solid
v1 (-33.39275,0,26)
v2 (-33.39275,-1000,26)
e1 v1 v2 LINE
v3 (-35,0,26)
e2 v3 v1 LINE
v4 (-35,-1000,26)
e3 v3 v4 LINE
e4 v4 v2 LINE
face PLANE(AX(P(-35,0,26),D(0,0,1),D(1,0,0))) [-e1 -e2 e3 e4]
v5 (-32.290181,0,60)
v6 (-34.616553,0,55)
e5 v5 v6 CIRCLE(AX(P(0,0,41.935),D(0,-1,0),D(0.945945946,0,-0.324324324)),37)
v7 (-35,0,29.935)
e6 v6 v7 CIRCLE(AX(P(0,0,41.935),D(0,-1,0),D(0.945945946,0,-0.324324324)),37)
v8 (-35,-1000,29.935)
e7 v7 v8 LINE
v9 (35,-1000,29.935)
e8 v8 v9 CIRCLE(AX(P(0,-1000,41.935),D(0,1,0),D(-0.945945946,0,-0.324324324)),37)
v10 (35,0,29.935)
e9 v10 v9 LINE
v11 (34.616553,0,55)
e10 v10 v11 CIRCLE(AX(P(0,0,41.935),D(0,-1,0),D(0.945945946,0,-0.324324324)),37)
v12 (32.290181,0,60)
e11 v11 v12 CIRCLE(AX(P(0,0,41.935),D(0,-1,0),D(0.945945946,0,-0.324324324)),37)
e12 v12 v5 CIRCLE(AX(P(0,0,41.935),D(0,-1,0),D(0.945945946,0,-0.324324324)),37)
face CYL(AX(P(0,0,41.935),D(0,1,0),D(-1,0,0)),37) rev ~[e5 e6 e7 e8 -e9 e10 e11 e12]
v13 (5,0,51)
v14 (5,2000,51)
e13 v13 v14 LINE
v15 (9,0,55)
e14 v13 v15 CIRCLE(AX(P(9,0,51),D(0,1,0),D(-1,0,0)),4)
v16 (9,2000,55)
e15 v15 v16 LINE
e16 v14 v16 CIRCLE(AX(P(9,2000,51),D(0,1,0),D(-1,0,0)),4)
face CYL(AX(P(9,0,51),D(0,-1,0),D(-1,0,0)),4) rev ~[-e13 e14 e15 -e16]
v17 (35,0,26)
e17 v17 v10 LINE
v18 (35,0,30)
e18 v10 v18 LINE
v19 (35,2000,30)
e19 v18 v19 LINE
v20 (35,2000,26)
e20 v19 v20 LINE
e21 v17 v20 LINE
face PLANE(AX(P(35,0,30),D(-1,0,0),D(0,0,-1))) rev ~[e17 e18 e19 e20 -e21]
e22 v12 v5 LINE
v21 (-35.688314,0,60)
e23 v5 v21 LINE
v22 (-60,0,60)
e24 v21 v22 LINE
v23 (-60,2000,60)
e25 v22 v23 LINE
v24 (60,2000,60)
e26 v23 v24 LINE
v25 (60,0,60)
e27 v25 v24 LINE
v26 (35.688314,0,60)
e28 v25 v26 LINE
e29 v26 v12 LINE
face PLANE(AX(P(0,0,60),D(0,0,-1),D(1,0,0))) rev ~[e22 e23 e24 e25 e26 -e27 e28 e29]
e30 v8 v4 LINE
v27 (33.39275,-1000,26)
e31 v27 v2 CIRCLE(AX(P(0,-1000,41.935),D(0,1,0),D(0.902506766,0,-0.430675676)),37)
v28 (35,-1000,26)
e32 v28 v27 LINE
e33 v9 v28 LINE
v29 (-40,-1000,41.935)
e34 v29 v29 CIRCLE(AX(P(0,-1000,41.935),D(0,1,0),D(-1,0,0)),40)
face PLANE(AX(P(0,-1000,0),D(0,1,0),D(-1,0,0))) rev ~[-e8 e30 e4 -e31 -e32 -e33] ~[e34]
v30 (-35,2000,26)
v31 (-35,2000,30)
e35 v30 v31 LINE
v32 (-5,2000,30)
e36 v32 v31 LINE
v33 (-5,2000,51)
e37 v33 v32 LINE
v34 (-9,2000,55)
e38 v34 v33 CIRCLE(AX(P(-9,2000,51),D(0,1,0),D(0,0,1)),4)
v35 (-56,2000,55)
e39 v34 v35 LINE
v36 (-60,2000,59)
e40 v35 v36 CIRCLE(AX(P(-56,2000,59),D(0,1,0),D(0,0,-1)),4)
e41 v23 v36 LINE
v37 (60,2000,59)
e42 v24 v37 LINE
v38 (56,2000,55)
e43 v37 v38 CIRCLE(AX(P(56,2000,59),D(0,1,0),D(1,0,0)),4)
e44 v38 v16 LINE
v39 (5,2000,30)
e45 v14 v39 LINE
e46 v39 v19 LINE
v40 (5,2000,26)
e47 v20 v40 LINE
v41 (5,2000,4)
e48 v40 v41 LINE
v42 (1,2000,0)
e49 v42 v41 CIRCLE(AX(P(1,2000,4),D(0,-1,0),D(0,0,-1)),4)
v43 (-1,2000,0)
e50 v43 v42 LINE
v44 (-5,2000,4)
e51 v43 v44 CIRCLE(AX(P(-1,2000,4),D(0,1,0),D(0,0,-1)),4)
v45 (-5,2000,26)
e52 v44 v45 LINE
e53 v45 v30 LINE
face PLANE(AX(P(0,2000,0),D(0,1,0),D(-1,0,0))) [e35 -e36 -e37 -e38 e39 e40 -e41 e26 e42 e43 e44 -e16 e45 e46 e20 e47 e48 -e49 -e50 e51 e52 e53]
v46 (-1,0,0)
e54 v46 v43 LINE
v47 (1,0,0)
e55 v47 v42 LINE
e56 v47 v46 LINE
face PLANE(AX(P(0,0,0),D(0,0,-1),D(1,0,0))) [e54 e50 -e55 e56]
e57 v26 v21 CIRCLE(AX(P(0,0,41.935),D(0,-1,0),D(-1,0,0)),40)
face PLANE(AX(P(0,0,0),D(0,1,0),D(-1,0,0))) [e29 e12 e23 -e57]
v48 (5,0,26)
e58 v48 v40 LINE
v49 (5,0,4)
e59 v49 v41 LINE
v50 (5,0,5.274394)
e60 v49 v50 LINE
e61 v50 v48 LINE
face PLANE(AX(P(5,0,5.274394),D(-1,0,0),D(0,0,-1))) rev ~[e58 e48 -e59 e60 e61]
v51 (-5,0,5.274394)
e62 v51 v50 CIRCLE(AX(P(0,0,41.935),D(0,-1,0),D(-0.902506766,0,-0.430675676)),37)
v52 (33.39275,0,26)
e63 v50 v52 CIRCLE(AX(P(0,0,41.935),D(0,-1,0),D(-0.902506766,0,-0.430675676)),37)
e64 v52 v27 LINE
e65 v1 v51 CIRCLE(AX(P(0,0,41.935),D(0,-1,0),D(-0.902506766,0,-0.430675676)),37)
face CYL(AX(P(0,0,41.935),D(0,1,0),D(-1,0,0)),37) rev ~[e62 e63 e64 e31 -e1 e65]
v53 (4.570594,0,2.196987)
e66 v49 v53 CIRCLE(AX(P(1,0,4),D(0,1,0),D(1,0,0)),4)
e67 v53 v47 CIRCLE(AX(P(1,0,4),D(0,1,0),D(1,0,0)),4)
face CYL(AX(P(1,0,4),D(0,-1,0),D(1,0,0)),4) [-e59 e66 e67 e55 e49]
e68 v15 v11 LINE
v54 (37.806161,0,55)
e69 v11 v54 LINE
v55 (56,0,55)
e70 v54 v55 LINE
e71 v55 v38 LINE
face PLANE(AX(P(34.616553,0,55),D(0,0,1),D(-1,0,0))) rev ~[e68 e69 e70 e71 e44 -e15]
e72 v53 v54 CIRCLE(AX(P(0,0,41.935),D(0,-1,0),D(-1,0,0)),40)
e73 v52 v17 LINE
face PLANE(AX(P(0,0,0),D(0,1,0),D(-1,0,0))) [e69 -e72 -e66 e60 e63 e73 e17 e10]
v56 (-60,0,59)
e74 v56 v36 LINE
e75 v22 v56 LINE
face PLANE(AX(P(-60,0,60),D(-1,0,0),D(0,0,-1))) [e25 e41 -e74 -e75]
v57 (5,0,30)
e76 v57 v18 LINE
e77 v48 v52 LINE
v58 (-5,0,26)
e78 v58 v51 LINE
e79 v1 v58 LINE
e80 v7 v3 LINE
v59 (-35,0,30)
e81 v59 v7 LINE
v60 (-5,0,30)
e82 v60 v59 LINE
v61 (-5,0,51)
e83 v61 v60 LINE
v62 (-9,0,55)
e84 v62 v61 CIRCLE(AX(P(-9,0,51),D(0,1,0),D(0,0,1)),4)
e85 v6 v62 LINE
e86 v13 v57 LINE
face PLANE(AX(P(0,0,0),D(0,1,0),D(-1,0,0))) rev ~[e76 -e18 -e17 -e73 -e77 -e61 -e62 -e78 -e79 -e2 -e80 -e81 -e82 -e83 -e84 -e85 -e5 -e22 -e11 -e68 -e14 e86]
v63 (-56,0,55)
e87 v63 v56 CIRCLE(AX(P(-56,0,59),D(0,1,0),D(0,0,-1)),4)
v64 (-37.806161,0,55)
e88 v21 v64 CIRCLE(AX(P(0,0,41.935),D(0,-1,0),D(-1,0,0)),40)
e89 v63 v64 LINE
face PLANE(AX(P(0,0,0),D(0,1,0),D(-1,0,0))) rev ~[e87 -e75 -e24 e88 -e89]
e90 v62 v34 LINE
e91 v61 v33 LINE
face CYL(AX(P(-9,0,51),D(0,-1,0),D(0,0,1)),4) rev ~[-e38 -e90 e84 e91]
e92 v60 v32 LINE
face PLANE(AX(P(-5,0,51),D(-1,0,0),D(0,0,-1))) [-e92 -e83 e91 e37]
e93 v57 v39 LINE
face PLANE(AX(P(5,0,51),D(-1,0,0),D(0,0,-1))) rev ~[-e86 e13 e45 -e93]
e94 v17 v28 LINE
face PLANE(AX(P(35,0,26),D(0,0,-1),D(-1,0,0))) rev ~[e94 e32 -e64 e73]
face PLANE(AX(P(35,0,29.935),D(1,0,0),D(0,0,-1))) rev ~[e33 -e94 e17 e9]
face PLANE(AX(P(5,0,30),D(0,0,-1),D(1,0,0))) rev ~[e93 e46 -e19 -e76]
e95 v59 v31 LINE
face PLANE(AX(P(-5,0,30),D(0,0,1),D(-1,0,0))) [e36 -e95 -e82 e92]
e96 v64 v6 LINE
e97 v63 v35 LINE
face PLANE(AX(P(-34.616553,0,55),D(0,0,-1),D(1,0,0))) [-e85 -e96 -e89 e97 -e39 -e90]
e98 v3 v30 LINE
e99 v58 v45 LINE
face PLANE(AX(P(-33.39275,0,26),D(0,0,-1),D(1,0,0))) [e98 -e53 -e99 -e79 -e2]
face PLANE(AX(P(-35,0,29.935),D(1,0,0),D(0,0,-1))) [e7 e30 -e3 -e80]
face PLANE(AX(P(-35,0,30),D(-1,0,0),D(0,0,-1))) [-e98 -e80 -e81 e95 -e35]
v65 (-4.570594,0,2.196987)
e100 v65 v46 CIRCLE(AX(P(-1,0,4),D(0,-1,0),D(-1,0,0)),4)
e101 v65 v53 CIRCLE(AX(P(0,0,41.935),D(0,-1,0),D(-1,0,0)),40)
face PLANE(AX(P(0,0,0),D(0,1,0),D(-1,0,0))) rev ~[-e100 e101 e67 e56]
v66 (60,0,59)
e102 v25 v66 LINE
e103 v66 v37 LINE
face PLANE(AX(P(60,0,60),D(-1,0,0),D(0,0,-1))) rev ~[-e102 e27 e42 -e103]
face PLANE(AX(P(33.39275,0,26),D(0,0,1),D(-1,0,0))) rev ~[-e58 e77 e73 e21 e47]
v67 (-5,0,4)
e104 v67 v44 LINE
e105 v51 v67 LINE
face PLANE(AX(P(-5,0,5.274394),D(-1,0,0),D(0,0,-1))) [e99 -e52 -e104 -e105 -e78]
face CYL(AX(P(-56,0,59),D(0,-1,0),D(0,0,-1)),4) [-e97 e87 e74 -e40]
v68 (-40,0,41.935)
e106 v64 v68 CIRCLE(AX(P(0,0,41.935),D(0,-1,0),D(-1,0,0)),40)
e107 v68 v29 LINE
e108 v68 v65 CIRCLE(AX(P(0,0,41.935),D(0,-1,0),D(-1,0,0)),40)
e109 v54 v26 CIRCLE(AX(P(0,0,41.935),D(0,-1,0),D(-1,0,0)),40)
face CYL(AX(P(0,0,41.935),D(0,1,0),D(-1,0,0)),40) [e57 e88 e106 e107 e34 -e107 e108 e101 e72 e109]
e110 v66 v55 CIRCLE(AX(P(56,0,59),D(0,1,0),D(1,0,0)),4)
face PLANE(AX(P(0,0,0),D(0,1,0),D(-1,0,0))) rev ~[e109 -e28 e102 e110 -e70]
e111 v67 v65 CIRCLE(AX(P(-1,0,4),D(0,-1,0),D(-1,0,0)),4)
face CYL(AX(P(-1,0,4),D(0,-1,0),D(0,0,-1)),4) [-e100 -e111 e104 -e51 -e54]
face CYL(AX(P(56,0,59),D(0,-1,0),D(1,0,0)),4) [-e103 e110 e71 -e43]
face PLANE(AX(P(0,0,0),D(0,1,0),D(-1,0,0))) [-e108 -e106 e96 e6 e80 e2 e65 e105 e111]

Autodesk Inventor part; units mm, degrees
ref_plane "YZ Plane" through (0, 0, 0) normal (1, 0, 0) x (0, 1, 0)
ref_plane "XZ Plane" through (0, 0, 0) normal (0, 1, 0) x (-1, 0, 0)
ref_plane "XY Plane" through (0, 0, 0) normal (0, 0, 1) x (1, 0, 0)
sketch "Sketch1" plane through (0, 0, 0) normal (0, 1, 0) x (-1, 0, 0)
  line L0 (0, 0) -> (0, 60)
  line L1 (0, 60) -> (60, 60)
  line L2 (56, 55) -> (9, 55)
  line L3 (5, 51) -> (5, 4)
  line L4 (60, 60) -> (60, 59)
  line L5 (0, 0) -> (1, 0)
  arc A0 (1, 0) -> (5, 4) centre (1, 4) ccw
  arc A1 (56, 55) -> (60, 59) centre (56, 59) ccw
  arc A2 (9, 55) -> (5, 51) centre (9, 51) ccw
  line L6 (5, 30) -> (35, 30)
  line L7 (35, 30) -> (35, 26)
  line L8 (35, 26) -> (5, 26)
  line L9 (0, 60) -> (-60, 60)
  line L10 (-56, 55) -> (-9, 55)
  line L11 (-5, 51) -> (-5, 4)
  line L12 (-60, 60) -> (-60, 59)
  line L13 (0, 0) -> (-1, 0)
  arc A3 (-5, 4) -> (-1, 0) centre (-1, 4) ccw
  arc A4 (-60, 59) -> (-56, 55) centre (-56, 59) ccw
  arc A5 (-5, 51) -> (-9, 55) centre (-9, 51) ccw
  line L14 (-5, 30) -> (-35, 30)
  line L15 (-35, 30) -> (-35, 26)
  line L16 (-35, 26) -> (-5, 26)
  circle A6 centre (0, 41.935) radius 40
  circle A7 centre (0, 41.935) radius 37
  dimension "d0" = 60
  dimension "d1" = 60
  dimension "d2" = 5
  dimension "d3" = 4
  dimension "d4" = 30
  dimension "d5" = 4
  dimension "d6" = 25
  dimension "d9" = 80
  dimension "d10" = 3
extrude "Extrusion1" add sketch "Sketch1" along normal blind 2000 contours L13 A3 A6 L0 | L0 A6 A0 L5 | A6 A3 L11 A7 L0 | L0 A7 L3 A0 A6 | A7 L11 A5 L10 L9 L0 | L0 L1 A7 L2 A2 L3 | A6 L9 A7 L10 | L10 A4 L12 L9 A6 | L1 A6 L2 A7 | L16 A7 L15 L14 L11 | L16 L15 A7 | L3 L6 L7 A7 L8 | A7 L7 L8 | A6 L1 L4 A1 L2
extrude "Extrusion2" add sketch "Sketch1" against normal blind 1000 contours A6 A3 L11 A7 L0 | L0 A7 L3 A0 A6 | A6 L10 A7 L15 L16 L11 A3 | A0 L3 A7 L8 L7 L2 A6 | A6 L9 A7 L10 | A7 L9 A6 L1 | L1 A6 L2 A7
properties part number "L60x2profilSas"
